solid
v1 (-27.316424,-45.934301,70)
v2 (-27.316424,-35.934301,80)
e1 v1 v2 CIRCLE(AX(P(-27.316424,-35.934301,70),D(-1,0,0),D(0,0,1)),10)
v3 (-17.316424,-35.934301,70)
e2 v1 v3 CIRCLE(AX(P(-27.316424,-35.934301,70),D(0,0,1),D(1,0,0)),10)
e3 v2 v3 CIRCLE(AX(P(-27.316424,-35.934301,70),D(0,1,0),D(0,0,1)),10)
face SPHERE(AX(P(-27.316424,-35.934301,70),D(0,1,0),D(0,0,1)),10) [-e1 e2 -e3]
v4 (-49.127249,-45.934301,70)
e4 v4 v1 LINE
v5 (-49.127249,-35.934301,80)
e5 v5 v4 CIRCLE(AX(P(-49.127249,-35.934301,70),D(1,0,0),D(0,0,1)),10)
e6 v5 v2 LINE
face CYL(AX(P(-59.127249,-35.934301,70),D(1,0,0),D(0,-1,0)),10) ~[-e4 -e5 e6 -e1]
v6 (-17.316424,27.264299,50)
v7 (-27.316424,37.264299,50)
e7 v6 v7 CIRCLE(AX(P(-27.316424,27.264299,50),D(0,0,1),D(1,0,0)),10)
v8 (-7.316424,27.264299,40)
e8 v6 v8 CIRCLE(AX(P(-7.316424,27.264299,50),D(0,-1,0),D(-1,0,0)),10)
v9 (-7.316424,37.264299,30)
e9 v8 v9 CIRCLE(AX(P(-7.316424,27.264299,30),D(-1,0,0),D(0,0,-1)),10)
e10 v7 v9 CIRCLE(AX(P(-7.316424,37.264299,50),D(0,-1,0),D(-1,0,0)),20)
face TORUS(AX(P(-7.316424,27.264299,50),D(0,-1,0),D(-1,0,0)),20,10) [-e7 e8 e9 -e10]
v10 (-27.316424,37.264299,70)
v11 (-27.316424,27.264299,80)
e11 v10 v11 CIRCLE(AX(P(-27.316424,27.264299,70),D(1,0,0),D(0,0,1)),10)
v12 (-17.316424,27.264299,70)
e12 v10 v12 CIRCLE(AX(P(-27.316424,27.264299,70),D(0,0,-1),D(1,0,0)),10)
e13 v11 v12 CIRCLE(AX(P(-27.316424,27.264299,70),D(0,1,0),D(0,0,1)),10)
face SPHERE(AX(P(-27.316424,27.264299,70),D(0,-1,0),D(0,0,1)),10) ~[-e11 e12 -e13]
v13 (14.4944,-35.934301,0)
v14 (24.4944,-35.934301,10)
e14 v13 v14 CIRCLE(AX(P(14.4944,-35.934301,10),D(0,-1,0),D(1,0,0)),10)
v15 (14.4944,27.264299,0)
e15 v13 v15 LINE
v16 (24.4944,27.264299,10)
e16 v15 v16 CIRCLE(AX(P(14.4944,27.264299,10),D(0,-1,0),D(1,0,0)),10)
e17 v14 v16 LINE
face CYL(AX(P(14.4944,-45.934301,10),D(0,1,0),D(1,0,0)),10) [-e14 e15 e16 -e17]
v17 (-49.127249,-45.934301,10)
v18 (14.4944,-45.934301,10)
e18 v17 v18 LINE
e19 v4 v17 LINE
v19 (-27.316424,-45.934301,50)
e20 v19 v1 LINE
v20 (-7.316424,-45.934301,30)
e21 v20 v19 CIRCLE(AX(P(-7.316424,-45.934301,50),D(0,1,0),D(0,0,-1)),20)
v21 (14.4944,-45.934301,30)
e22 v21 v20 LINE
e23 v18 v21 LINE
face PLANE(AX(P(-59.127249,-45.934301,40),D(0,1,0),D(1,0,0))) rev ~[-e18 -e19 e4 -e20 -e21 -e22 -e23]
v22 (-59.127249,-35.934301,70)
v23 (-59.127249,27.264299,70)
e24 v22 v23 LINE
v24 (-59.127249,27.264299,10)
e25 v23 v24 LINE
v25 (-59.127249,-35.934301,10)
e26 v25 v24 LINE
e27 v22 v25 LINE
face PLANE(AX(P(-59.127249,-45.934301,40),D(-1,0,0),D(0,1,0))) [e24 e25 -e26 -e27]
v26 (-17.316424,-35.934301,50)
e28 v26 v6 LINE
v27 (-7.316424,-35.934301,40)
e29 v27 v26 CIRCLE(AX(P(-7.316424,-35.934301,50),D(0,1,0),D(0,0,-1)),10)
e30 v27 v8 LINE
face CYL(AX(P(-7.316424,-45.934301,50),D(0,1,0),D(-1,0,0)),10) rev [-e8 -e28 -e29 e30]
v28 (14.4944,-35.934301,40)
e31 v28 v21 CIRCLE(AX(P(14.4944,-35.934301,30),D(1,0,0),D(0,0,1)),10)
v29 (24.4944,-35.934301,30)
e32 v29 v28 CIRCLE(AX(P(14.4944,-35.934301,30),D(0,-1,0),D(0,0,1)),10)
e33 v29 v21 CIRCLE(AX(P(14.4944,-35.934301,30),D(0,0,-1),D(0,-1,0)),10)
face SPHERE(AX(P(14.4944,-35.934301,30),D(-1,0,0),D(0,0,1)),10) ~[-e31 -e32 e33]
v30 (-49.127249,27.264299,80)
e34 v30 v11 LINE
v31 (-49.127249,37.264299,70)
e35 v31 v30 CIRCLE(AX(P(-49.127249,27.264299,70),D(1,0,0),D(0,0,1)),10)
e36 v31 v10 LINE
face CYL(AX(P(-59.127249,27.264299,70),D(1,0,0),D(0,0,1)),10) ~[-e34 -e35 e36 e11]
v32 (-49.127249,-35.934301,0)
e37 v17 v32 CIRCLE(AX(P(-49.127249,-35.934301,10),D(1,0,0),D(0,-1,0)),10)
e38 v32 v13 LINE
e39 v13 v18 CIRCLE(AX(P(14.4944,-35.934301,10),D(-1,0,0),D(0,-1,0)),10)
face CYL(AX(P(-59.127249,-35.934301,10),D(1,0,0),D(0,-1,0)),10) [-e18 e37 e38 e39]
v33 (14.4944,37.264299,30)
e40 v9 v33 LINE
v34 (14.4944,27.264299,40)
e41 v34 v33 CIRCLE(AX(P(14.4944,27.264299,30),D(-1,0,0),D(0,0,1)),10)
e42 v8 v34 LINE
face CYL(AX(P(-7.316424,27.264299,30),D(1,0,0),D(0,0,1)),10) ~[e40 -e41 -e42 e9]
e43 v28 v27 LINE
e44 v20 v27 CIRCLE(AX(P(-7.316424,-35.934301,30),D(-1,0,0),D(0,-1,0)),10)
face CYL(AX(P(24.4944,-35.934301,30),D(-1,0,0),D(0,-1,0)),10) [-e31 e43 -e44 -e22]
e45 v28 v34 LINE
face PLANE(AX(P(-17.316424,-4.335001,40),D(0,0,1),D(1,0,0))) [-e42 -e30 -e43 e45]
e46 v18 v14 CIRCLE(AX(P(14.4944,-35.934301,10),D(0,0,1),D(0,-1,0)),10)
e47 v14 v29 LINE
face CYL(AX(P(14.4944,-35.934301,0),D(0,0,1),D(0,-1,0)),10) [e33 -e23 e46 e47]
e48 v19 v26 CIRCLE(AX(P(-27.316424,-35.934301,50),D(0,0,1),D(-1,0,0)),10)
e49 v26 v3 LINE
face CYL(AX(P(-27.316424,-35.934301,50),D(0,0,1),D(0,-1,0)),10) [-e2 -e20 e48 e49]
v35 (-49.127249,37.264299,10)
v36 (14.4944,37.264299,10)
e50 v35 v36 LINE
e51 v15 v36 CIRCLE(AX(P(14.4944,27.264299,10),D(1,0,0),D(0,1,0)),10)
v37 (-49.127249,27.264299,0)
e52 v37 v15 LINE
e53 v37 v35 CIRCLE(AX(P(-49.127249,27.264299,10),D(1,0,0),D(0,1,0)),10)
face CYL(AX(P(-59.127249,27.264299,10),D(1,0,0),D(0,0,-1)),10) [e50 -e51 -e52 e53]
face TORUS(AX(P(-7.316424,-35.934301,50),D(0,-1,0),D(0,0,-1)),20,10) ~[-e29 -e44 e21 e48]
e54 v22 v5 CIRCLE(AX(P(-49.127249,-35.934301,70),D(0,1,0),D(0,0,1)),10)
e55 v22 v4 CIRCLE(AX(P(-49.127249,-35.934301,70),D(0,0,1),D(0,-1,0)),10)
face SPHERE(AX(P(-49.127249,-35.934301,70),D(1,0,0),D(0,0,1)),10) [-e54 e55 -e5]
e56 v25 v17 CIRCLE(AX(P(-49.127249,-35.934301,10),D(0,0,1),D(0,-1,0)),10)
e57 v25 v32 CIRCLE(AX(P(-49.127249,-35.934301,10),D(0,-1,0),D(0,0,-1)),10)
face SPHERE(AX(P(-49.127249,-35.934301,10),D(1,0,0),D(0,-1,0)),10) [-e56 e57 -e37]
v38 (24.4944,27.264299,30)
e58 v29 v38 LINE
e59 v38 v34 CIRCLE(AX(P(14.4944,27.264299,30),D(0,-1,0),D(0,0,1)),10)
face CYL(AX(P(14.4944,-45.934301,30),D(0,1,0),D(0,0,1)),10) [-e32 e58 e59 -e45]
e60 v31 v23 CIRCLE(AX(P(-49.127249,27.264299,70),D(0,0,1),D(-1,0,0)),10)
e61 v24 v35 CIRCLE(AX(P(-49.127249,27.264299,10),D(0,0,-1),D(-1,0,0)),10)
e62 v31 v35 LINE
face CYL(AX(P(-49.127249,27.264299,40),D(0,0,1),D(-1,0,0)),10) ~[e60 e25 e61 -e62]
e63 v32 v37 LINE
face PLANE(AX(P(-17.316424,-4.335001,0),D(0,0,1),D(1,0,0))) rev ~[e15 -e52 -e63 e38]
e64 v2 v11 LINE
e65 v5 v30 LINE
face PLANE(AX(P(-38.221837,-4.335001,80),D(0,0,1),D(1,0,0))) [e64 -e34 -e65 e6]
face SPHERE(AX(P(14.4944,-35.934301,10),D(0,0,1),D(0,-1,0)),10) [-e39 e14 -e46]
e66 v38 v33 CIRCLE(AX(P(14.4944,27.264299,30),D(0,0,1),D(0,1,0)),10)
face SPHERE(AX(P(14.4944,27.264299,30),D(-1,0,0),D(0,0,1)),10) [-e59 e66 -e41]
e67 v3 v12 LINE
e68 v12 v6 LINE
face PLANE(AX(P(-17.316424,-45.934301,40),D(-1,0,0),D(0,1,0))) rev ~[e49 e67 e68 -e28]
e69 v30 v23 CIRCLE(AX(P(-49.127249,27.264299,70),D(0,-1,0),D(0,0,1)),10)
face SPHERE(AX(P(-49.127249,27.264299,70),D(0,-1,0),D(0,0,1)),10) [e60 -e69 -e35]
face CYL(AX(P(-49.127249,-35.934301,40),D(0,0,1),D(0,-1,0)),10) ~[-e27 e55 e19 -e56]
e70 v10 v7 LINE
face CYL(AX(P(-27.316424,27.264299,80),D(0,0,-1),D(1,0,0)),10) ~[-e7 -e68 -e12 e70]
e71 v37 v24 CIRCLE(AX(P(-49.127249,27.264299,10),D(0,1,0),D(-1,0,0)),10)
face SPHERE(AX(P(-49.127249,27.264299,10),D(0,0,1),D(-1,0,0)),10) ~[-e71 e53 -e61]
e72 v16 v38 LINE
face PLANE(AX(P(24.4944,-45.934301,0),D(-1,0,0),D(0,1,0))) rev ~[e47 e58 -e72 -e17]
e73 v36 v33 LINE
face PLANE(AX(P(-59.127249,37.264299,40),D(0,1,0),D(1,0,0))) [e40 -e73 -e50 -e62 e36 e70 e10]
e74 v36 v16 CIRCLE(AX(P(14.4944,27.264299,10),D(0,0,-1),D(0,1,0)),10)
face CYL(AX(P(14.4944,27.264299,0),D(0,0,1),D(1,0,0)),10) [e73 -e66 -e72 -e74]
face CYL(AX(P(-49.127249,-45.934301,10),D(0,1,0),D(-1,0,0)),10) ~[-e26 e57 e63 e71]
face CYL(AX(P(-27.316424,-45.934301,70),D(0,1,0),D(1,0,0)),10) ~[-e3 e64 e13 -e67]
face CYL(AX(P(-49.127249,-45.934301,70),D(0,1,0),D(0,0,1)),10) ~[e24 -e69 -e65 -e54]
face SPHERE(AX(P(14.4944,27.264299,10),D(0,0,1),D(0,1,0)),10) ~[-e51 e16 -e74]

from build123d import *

# Parameters (mm, degrees)
F0_W     = 83.6216490716
F0_H     = 83.1985995173
F1_DEPTH = 40
F2_W     = 41.8108245358
F2_H     = 83.1985995173
F3_DEPTH = 40
F4_F1_R  = 10
F4_F2_R  = 10


with BuildPart() as f1:
    # F0 (on Top) → F1 (new body)
    with BuildSketch(Plane.XY):
        with Locations((-17.3164242879, -4.335001111)):
            Rectangle(F0_W, F0_H)
    extrude(amount=F1_DEPTH)

    # F2 (on face) → F3 (join)
    with BuildSketch(Plane.XY.offset(40)):
        with Locations((-38.2218365557, -4.335001111)):
            Rectangle(F2_W, F2_H)
    extrude(amount=F3_DEPTH)

    # F4: fillet of radius 10 on 16 edges, made by hand

    # F4_f1
    f4_f1_edges = [f1.edges().sort_by_distance(p)[0] for p in [
        (-17.3164242879, -4.335001111, 40),
    ]]
    fillet(f4_f1_edges, radius=F4_F1_R)

    # F4_f2
    f4_f2_edges = [f1.edges().sort_by_distance(p)[0] for p in [
        (-17.3164242879, -4.335001111, 80),
        (-38.2218365557, -45.9343008697, 80),
        (-17.3164242879, -45.9343008697, 65),
        (-59.1272488236, -4.335001111, 80),
        (-38.2218365557, 37.2642986476, 80),
        (8.58898798, 37.2642986476, 40),
        (24.4944002479, -4.335001111, 40),
        (24.4944002479, -45.9343008697, 20),
        (24.4944002479, 37.2642986476, 20),
        (-17.3164242879, -45.9343008697, 0),
        (-59.1272488236, -45.9343008697, 40),
        (-59.1272488236, 37.2642986476, 40),
        (-59.1272488236, -4.335001111, 0),
        (-17.3164242879, 37.2642986476, 0),
        (24.4944002479, -4.335001111, 0),
        (-14.3874920997, 37.2642986476, 42.9289321881),
        (-14.3874920997, -45.9343008697, 42.9289321881),
    ]]
    fillet(f4_f2_edges, radius=F4_F2_R)


solid = f1.part
